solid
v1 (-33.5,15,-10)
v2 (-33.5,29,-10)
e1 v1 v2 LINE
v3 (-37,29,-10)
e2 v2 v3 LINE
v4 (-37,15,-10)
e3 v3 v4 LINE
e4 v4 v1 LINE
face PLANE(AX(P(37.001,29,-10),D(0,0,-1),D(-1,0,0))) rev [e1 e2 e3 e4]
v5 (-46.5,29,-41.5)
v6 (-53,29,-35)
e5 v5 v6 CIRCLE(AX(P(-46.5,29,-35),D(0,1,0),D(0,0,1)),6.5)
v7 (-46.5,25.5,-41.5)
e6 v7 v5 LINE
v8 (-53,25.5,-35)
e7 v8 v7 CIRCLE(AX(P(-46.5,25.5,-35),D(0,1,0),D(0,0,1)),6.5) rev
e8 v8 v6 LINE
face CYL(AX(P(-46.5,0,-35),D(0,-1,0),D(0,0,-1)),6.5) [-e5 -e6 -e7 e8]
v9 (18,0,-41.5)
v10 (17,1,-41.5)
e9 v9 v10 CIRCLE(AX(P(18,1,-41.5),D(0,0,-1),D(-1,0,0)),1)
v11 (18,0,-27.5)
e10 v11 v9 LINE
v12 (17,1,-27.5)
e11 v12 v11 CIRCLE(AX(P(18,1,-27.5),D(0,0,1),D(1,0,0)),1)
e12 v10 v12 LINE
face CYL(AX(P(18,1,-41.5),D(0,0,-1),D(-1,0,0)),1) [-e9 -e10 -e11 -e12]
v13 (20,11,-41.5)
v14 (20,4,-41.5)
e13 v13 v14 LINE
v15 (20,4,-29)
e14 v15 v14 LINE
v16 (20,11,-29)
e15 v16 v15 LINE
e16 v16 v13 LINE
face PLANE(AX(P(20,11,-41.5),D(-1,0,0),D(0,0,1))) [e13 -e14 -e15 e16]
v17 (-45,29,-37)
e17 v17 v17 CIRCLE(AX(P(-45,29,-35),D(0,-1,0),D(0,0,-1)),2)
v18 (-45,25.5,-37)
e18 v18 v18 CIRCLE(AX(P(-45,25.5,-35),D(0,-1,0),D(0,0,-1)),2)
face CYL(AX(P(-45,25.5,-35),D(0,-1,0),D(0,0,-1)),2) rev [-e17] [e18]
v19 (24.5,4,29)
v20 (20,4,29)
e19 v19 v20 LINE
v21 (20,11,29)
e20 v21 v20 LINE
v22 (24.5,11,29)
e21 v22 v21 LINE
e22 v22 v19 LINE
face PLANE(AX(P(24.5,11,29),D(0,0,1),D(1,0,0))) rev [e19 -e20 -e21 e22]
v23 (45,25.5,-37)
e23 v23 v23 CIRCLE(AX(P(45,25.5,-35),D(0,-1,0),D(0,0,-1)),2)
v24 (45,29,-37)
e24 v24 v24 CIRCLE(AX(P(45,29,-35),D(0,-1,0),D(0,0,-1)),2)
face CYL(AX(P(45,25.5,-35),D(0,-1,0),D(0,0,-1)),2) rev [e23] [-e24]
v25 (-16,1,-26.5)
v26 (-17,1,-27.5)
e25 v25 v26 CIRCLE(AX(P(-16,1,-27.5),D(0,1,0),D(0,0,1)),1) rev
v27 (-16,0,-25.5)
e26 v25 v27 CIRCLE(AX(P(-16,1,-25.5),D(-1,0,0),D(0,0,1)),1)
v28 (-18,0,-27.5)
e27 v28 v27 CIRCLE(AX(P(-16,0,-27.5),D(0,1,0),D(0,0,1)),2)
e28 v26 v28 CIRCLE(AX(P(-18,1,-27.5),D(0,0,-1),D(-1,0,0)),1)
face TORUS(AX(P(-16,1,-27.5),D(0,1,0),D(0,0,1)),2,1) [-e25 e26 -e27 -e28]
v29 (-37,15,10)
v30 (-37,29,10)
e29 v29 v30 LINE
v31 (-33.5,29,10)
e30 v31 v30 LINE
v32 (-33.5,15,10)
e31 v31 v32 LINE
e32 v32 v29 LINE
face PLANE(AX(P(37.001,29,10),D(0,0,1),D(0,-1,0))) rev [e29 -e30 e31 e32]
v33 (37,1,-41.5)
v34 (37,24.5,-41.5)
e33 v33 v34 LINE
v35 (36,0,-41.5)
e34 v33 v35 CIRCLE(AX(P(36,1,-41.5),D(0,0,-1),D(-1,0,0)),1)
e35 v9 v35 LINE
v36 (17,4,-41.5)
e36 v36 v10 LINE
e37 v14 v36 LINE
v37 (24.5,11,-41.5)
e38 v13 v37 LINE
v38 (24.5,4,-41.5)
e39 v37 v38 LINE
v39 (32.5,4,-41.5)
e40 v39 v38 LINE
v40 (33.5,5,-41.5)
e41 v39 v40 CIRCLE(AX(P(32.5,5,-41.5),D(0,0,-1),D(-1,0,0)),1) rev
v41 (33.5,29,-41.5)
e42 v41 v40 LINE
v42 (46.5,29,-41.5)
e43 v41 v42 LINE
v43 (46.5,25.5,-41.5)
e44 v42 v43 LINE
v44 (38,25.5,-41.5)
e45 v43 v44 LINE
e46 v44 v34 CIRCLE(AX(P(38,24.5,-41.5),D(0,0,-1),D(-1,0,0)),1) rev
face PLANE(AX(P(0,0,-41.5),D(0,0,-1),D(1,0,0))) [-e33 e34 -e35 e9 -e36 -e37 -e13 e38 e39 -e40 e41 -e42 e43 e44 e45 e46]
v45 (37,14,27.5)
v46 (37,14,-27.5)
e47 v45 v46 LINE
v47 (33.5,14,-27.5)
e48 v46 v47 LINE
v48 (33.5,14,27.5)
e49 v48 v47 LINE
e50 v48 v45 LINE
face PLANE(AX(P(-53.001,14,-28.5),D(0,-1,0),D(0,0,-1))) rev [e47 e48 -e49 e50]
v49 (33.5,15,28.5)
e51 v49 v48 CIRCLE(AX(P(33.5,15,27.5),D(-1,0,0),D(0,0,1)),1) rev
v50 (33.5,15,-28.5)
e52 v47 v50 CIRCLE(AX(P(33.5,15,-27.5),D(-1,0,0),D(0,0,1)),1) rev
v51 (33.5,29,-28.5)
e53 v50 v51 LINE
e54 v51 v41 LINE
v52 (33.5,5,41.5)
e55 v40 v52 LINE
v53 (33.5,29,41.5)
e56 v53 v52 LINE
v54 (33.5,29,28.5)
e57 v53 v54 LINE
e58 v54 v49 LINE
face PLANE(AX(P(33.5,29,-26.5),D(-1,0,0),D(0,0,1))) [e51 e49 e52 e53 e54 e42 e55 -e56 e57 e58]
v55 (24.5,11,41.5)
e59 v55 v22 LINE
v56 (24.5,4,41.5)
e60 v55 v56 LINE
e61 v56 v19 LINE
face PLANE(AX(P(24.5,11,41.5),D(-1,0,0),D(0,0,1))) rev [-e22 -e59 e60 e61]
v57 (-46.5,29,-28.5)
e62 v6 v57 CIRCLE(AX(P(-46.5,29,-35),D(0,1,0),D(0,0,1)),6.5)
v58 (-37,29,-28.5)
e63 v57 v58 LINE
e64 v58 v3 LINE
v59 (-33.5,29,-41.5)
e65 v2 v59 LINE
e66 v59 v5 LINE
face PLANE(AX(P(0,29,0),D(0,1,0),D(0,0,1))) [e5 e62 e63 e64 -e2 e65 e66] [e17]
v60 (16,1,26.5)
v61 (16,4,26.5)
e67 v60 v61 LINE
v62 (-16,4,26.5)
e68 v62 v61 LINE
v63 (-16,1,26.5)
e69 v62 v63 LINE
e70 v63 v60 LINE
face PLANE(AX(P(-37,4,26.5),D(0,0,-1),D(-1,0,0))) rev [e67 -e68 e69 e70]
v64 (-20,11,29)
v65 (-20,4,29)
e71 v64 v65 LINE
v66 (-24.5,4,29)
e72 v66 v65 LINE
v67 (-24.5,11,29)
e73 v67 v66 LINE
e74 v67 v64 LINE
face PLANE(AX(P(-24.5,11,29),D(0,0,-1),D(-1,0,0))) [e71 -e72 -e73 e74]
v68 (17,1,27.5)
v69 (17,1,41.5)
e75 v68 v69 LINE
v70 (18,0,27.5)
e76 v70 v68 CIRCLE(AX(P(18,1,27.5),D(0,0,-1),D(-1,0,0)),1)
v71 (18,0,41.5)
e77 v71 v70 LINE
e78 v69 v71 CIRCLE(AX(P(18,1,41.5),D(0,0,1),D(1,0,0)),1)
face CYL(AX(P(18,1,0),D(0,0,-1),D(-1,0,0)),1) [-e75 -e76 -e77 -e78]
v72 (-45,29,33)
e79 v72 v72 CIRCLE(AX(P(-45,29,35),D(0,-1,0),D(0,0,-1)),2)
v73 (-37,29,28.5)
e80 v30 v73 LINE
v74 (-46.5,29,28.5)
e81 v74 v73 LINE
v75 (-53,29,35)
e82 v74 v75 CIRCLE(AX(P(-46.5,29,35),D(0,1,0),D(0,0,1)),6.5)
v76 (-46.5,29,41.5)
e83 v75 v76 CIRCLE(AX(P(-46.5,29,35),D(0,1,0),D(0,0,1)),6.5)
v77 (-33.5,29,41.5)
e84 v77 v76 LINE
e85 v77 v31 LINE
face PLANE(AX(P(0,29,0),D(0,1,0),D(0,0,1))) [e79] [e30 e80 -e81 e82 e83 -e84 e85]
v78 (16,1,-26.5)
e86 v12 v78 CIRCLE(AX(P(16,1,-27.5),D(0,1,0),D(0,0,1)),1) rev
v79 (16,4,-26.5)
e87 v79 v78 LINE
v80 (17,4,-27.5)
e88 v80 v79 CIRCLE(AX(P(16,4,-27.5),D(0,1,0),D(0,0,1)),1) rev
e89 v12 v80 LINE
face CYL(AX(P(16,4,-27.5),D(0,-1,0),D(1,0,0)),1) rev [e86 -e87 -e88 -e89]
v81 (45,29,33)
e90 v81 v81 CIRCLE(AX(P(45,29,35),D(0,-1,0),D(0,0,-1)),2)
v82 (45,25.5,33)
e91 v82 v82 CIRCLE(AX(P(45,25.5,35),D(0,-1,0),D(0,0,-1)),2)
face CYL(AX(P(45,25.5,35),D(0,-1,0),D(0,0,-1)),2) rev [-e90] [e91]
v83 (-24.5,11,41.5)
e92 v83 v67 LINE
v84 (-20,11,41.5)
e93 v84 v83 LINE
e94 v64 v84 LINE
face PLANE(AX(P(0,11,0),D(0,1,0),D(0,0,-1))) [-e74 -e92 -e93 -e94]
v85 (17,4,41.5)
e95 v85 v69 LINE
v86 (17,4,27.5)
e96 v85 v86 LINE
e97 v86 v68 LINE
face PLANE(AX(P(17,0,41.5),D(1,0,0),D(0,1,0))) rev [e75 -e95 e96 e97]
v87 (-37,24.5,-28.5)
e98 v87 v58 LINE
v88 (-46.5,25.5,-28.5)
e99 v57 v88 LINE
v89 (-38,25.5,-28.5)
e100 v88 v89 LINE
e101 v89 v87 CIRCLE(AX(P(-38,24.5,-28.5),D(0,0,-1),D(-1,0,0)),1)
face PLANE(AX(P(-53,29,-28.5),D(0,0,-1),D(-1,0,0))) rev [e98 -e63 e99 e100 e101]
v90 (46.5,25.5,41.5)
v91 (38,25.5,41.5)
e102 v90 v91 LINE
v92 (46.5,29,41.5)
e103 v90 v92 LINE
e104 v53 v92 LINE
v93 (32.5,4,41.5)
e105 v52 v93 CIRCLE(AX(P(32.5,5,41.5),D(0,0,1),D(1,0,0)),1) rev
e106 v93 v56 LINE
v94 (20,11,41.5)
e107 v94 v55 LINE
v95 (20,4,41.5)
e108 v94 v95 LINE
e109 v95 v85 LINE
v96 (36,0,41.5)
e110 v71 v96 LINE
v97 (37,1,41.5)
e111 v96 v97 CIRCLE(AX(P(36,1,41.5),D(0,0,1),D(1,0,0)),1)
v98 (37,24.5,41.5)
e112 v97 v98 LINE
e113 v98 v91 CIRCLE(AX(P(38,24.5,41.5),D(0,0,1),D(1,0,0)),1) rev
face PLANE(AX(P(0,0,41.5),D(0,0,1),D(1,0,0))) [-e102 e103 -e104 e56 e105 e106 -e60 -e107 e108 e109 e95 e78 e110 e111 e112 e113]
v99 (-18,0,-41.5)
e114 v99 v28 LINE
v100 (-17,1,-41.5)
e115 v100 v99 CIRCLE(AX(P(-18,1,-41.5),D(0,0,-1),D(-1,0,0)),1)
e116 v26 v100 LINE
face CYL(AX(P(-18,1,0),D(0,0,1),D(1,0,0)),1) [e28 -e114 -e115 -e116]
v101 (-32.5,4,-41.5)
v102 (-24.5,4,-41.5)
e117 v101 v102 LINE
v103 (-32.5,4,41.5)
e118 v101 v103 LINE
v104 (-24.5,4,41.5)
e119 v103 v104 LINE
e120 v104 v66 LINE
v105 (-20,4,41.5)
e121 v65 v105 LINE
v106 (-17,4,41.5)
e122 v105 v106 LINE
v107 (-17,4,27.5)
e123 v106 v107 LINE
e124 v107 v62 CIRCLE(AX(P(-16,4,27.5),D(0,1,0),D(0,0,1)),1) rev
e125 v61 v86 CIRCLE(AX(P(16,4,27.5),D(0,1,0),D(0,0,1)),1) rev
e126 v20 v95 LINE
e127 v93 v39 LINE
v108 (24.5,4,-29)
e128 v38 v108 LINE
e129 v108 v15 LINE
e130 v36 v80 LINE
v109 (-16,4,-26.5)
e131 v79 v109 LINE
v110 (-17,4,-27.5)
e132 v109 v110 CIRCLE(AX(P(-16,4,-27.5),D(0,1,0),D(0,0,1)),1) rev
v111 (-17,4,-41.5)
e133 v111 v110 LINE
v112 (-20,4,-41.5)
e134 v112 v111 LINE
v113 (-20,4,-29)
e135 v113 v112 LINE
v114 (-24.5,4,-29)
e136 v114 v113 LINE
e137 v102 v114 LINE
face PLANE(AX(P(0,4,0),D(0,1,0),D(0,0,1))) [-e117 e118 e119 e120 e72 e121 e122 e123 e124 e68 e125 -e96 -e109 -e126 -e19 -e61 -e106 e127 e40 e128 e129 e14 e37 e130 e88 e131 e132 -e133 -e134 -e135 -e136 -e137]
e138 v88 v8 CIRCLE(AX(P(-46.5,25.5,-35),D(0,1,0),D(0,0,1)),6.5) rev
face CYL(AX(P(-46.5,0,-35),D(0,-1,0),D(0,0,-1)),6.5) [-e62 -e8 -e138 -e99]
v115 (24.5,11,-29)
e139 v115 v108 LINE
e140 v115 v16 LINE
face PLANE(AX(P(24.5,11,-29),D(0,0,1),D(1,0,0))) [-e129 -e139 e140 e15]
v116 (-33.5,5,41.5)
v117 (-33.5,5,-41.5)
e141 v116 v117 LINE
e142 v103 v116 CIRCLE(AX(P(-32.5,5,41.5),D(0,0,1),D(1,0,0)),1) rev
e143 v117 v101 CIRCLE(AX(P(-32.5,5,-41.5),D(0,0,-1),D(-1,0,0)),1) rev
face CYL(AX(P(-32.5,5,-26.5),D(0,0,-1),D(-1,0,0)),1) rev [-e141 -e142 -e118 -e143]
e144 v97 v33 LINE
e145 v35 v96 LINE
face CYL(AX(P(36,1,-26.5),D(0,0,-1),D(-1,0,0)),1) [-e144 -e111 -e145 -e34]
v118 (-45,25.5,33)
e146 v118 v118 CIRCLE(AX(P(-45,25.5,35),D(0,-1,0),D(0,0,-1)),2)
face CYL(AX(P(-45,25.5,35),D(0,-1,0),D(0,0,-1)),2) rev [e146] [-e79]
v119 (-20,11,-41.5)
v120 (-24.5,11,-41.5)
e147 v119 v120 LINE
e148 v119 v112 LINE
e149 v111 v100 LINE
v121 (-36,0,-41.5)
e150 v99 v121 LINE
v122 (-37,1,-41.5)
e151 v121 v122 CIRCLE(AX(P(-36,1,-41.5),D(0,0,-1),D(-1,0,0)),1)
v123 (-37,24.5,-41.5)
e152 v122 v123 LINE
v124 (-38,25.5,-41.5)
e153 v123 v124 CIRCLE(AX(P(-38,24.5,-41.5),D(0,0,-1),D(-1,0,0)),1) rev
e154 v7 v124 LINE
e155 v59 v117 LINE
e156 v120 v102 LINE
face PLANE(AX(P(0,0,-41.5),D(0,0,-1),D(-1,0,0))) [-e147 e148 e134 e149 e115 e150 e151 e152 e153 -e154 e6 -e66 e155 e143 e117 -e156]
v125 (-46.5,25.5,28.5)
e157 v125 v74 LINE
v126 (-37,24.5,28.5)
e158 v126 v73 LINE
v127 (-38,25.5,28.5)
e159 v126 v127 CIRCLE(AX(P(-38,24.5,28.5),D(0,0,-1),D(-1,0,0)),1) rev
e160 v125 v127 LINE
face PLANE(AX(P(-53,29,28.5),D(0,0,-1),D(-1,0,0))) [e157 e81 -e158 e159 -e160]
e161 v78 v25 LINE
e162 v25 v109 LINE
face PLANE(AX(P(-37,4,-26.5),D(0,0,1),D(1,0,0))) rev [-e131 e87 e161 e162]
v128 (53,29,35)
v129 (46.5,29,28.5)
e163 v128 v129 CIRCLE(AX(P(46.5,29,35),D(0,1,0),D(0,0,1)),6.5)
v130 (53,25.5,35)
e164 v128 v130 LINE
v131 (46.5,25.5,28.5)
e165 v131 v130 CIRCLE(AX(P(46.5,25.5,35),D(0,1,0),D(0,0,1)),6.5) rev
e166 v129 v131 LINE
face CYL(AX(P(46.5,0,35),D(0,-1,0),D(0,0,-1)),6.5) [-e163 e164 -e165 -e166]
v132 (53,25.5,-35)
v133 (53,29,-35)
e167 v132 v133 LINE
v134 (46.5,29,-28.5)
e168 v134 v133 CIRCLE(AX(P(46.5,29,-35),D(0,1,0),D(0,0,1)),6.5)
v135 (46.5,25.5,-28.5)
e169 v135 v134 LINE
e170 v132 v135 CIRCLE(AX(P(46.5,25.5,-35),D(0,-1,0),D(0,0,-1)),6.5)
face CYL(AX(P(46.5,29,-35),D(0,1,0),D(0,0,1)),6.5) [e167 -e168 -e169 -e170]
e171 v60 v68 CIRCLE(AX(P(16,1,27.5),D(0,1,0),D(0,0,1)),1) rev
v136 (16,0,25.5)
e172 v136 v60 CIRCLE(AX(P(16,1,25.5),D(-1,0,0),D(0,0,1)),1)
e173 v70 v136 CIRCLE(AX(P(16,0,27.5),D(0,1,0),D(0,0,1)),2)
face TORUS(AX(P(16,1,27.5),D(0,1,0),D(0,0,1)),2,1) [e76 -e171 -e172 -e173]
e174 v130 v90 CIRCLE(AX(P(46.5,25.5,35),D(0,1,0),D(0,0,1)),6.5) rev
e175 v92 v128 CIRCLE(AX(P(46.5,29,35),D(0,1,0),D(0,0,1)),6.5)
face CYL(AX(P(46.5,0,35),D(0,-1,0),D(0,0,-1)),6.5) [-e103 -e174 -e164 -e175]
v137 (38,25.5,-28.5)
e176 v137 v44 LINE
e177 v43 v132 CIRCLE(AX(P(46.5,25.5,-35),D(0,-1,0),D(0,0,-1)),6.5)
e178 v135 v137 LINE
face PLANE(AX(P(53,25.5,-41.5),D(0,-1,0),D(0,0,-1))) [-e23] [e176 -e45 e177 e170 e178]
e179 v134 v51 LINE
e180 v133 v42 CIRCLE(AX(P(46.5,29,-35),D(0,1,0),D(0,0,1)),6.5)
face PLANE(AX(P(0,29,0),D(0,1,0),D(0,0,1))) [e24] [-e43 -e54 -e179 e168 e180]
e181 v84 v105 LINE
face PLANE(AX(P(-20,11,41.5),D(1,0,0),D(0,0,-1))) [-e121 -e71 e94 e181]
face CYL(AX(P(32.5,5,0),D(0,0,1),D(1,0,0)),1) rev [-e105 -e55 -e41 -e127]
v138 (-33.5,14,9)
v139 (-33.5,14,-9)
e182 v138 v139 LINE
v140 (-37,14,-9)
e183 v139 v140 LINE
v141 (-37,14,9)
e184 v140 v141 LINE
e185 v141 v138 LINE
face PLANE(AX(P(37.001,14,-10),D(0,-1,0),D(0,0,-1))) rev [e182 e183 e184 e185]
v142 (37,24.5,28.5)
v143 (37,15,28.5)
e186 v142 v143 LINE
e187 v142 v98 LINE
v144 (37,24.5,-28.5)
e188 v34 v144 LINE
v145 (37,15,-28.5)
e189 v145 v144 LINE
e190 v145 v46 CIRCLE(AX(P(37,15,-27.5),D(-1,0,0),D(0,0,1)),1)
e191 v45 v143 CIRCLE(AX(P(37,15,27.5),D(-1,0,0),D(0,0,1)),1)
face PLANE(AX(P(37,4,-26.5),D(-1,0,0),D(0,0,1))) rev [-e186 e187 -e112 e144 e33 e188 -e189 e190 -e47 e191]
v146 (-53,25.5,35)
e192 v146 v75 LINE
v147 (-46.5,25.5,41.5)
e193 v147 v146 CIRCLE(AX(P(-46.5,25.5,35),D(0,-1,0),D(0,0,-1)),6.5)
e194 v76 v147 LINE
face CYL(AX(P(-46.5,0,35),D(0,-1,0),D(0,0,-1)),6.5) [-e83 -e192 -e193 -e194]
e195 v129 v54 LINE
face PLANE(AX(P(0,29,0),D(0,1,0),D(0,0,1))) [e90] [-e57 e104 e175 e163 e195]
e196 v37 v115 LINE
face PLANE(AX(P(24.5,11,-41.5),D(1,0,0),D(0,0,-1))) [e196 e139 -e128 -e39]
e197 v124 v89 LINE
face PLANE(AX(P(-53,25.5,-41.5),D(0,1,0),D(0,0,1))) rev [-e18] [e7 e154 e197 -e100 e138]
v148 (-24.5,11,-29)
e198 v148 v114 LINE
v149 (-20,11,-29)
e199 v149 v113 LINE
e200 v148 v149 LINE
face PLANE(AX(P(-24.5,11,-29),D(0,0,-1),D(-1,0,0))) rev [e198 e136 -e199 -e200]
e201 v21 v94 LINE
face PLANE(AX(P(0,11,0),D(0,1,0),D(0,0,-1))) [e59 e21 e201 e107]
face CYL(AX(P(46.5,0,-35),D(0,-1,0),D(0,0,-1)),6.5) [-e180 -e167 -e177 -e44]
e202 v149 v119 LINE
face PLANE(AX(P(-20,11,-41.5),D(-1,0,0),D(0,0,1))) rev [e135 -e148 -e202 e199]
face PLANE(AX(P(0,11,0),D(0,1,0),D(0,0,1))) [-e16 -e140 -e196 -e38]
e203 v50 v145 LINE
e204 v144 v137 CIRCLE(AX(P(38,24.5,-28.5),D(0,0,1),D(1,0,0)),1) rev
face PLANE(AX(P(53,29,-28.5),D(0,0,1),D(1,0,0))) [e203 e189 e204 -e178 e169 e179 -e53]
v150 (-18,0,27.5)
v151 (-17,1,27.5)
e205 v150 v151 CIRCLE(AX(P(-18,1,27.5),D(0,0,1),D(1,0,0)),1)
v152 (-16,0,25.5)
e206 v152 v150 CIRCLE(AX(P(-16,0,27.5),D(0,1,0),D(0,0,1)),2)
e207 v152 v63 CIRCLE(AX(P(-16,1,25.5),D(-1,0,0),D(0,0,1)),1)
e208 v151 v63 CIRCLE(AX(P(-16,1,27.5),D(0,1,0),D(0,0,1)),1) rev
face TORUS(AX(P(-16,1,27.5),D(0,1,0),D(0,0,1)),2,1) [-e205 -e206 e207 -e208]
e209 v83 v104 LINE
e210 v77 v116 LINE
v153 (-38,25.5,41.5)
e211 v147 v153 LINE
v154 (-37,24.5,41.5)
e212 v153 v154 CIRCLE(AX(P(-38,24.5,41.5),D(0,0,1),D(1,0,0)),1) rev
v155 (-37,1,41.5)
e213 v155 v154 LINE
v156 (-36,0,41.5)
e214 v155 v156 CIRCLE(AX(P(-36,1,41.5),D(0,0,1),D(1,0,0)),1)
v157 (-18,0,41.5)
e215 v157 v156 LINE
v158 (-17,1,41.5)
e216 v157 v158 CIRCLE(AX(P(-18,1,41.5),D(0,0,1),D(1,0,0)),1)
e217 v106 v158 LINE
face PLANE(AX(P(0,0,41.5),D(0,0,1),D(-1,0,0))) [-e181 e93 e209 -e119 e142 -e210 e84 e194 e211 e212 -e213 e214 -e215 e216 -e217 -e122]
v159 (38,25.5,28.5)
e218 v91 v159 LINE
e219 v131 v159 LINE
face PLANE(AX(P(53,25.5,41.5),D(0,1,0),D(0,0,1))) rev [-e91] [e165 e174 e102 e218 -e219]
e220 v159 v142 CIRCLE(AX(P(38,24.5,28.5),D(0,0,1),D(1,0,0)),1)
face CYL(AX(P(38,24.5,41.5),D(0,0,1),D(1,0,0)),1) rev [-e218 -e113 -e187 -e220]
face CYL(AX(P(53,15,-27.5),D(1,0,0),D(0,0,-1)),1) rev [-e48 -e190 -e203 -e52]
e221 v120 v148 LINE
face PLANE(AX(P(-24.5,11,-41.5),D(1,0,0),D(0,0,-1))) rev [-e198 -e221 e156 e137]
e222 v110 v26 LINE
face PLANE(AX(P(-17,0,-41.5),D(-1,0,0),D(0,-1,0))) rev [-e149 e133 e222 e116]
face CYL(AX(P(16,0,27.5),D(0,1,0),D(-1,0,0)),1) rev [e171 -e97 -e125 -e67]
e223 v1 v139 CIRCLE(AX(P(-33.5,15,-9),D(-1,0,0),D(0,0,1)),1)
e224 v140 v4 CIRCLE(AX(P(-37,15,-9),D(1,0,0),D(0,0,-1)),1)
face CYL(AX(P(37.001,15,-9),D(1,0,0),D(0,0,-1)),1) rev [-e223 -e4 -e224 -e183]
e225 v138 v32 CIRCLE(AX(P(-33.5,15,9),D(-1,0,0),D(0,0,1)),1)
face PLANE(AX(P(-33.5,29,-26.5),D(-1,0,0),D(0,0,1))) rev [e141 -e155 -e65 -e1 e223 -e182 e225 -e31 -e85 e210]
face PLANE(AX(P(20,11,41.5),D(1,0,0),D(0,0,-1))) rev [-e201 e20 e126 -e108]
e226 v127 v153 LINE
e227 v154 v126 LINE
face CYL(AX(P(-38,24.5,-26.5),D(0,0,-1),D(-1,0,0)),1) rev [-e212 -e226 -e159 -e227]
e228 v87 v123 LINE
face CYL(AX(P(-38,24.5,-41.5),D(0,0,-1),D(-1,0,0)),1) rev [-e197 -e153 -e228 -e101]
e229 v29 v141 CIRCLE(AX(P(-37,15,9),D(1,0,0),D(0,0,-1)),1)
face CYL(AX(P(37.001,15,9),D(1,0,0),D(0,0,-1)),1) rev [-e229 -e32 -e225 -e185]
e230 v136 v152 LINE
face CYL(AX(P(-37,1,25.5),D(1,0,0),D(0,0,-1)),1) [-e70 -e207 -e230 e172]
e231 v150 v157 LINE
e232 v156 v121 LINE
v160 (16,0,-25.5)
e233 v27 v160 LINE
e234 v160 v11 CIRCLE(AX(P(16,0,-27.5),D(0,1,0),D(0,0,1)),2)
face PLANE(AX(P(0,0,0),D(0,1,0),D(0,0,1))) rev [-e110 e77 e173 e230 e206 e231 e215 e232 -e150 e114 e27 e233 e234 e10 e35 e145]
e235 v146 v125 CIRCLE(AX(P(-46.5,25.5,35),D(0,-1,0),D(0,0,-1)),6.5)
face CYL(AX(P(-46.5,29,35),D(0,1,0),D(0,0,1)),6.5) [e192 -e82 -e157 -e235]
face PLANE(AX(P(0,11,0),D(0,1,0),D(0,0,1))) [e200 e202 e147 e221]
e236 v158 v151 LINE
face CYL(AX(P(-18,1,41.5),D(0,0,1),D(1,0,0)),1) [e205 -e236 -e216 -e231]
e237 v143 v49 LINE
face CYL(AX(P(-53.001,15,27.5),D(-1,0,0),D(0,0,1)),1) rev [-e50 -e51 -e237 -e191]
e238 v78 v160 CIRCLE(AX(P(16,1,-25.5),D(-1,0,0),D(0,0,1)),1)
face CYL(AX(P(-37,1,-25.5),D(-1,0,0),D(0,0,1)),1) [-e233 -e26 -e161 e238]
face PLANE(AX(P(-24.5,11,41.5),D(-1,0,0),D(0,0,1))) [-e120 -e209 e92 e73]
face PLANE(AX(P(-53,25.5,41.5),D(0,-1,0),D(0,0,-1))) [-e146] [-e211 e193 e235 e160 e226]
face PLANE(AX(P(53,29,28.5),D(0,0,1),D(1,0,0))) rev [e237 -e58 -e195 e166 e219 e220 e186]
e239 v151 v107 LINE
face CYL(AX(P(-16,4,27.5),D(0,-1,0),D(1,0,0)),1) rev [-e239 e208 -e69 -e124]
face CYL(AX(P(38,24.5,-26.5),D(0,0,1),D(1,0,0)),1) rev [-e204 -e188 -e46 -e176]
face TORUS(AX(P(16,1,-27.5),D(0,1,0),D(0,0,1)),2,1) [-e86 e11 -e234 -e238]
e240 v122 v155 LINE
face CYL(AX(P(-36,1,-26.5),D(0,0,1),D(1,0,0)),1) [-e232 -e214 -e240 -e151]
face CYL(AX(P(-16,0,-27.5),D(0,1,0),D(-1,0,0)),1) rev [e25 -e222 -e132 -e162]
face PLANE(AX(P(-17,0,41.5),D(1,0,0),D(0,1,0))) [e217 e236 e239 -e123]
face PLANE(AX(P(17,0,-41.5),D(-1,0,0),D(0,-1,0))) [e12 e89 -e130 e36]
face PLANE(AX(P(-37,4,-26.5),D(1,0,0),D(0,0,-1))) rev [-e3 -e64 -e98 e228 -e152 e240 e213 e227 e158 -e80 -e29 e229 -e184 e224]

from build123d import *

# Parameters (mm, degrees)
SKETCH1_W                       = 74
SKETCH1_H                       = 53
BOSS_EXTRUDE1_DEPTH             = 4
SKETCH2_W                       = 3.5
SKETCH2_H                       = 53
BOSS_EXTRUDE2_DEPTH             = 25
CUT_EXTRUDE1_REACH              = 85.781
SKETCH3_W                       = 20
SKETCH3_H                       = 15
SKETCH5_W                       = 20
SKETCH5_H                       = 4
BOSS_EXTRUDE4_DEPTH             = 15
MIRROR4_COPY_1_SKETCH_W         = 20
MIRROR4_COPY_1_SKETCH_H         = 4
MIRROR4_COPY_1_DEPTH            = 15
SKETCH6_W                       = 3.5
SKETCH6_H                       = 15
BOSS_EXTRUDE5_DEPTH             = 25
MIRROR6_COPY_1_SKETCH_W         = 3.5
MIRROR6_COPY_1_SKETCH_H         = 15
MIRROR6_COPY_1_DEPTH            = 25
MIRROR6_COPY_2_SKETCH_W         = 3.5
MIRROR6_COPY_2_SKETCH_H         = 15
MIRROR6_COPY_2_DEPTH            = 25
SKETCH7_W                       = 4.5
SKETCH7_H                       = 12.5
BOSS_EXTRUDE6_DEPTH             = 7
MIRROR8_COPY_1_SKETCH_W         = 4.5
MIRROR8_COPY_1_SKETCH_H         = 12.5
MIRROR8_COPY_1_DEPTH            = 7
SKETCH8_W                       = 13
SKETCH8_H                       = 3.5
BOSS_EXTRUDE7_DEPTH             = 16
MIRROR10_COPY_1_SKETCH_W        = 13
MIRROR10_COPY_1_SKETCH_H        = 3.5
MIRROR10_COPY_1_DEPTH           = 16
CUT_EXTRUDE2_REACH              = 105.263
SKETCH9_W                       = 57
SKETCH9_H                       = 15
F_4_0MM_CLEARANCE_DOWEL_HOLE1_D = 4
FILLET1_R                       = 6.5
FILLET2_R                       = 1
FILLET3_R                       = 1


with BuildPart() as part:
    # Sketch1 → Boss-Extrude1 (new body)
    with BuildSketch(Plane(origin=(0, 0, 0), x_dir=(1, 0, 0), z_dir=(0, 1, 0))):
        Rectangle(SKETCH1_W, SKETCH1_H)
    extrude(amount=BOSS_EXTRUDE1_DEPTH)

    # Sketch2 → Boss-Extrude2 (add)
    with BuildSketch(Plane(origin=(0, 4, 0), x_dir=(1, 0, 0), z_dir=(0, 1, 0))):
        with Locations((-35.25, 0)):
            Rectangle(SKETCH2_W, SKETCH2_H)
    boss_extrude2 = extrude(amount=BOSS_EXTRUDE2_DEPTH)

    # Mirror1: Boss-Extrude2 across plane
    add(boss_extrude2.mirror(Plane(origin=(0, 0, 0), x_dir=(0, 0, 1), z_dir=(1, 0, 0))))

    # Sketch3 → Cut-Extrude1 (cut, up to next)
    with BuildSketch(Plane.ZY.offset(37), mode=Mode.PRIVATE) as cut_extrude1_sk1:
        with Locations((0, 21.5)):
            Rectangle(SKETCH3_W, SKETCH3_H)
    cut_extrude1_tool1 = extrude(cut_extrude1_sk1.sketch, amount=-CUT_EXTRUDE1_REACH, mode=Mode.PRIVATE) & part.part
    add(cut_extrude1_tool1.solids().sort_by_distance((-37, 21.5, 0))[0], mode=Mode.SUBTRACT)

    # Sketch5 → Boss-Extrude4 (add)
    with BuildSketch(Plane(origin=(0, 0, -26.5), x_dir=(-1, 0, 0), z_dir=(0, 0, -1))):
        with Locations((27, 2)):
            Rectangle(SKETCH5_W, SKETCH5_H)
    boss_extrude4 = extrude(amount=BOSS_EXTRUDE4_DEPTH)

    # Mirror3: Boss-Extrude4 across plane
    add(boss_extrude4.mirror(Plane.XY))

    # Mirror4: Boss-Extrude4 across plane
    add(boss_extrude4.mirror(Plane(origin=(0, 0, 0), x_dir=(0, 0, 1), z_dir=(1, 0, 0))))

    # Mirror4 copy 1 sketch → Mirror4 copy 1 (add)
    with BuildSketch(Plane.XY.offset(26.5)):
        with Locations((27, 2)):
            Rectangle(MIRROR4_COPY_1_SKETCH_W, MIRROR4_COPY_1_SKETCH_H)
    extrude(amount=MIRROR4_COPY_1_DEPTH)

    # Sketch6 → Boss-Extrude5 (add)
    with BuildSketch(Plane(origin=(0, 4, 0), x_dir=(1, 0, 0), z_dir=(0, 1, 0))):
        with Locations((-35.25, 34)):
            Rectangle(SKETCH6_W, SKETCH6_H)
    boss_extrude5 = extrude(amount=BOSS_EXTRUDE5_DEPTH)

    # Mirror5: Boss-Extrude5 across plane
    add(boss_extrude5.mirror(Plane.XY))

    # Mirror6 copy 1 sketch → Mirror6 copy 1 (add)
    with BuildSketch(Plane(origin=(0, 4, 0), x_dir=(-1, 0, 0), z_dir=(0, 1, 0))):
        with Locations((-35.25, 34)):
            Rectangle(MIRROR6_COPY_1_SKETCH_W, MIRROR6_COPY_1_SKETCH_H)
    extrude(amount=MIRROR6_COPY_1_DEPTH)

    # Mirror6 copy 2 sketch → Mirror6 copy 2 (add)
    with BuildSketch(Plane(origin=(0, 4, 0), x_dir=(-1, 0, 0), z_dir=(0, 1, 0))):
        with Locations((-35.25, -34)):
            Rectangle(MIRROR6_COPY_2_SKETCH_W, MIRROR6_COPY_2_SKETCH_H)
    extrude(amount=MIRROR6_COPY_2_DEPTH)

    # Sketch7 → Boss-Extrude6 (add)
    with BuildSketch(Plane(origin=(0, 4, 0), x_dir=(1, 0, 0), z_dir=(0, 1, 0))):
        with Locations((-22.25, 35.25)):
            Rectangle(SKETCH7_W, SKETCH7_H)
    boss_extrude6 = extrude(amount=BOSS_EXTRUDE6_DEPTH)

    # Mirror7: Boss-Extrude6 across plane
    add(boss_extrude6.mirror(Plane.XY))

    # Mirror8: Boss-Extrude6 across plane
    add(boss_extrude6.mirror(Plane(origin=(0, 0, 0), x_dir=(0, 0, 1), z_dir=(1, 0, 0))))

    # Mirror8 copy 1 sketch → Mirror8 copy 1 (add)
    with BuildSketch(Plane(origin=(0, 4, 0), x_dir=(-1, 0, 0), z_dir=(0, 1, 0))):
        with Locations((-22.25, 35.25)):
            Rectangle(MIRROR8_COPY_1_SKETCH_W, MIRROR8_COPY_1_SKETCH_H)
    extrude(amount=MIRROR8_COPY_1_DEPTH)

    # Sketch8 → Boss-Extrude7 (add)
    with BuildSketch(Plane.ZY.offset(37)):
        with Locations((-35, 27.25)):
            Rectangle(SKETCH8_W, SKETCH8_H)
    boss_extrude7 = extrude(amount=BOSS_EXTRUDE7_DEPTH)

    # Mirror9: Boss-Extrude7 across plane
    add(boss_extrude7.mirror(Plane.XY))

    # Mirror10: Boss-Extrude7 across plane
    add(boss_extrude7.mirror(Plane(origin=(0, 0, 0), x_dir=(0, 0, 1), z_dir=(1, 0, 0))))

    # Mirror10 copy 1 sketch → Mirror10 copy 1 (add)
    with BuildSketch(Plane(origin=(37, 0, 0), x_dir=(0, 0, -1), z_dir=(1, 0, 0))):
        with Locations((-35, 27.25)):
            Rectangle(MIRROR10_COPY_1_SKETCH_W, MIRROR10_COPY_1_SKETCH_H)
    extrude(amount=MIRROR10_COPY_1_DEPTH)

    # Sketch9 → Cut-Extrude2 (cut, up to next)
    with BuildSketch(Plane(origin=(37, 0, 0), x_dir=(0, 0, -1), z_dir=(1, 0, 0)), mode=Mode.PRIVATE) as cut_extrude2_sk1:
        with Locations((0, 21.5)):
            Rectangle(SKETCH9_W, SKETCH9_H)
    cut_extrude2_tool1 = extrude(cut_extrude2_sk1.sketch, amount=-CUT_EXTRUDE2_REACH, mode=Mode.PRIVATE) & part.part
    add(cut_extrude2_tool1.solids().sort_by_distance((37, 21.5, 0))[0], mode=Mode.SUBTRACT)

    # Ø4.0mm Clearance Dowel Hole1 (through all)
    with Locations(Plane(origin=(0, 25.5, 0), x_dir=(-1, 0, 0), z_dir=(0, -1, 0))):
        with Locations((-45, 35), (-45, -35), (45, 35), (45, -35)):
            Hole(F_4_0MM_CLEARANCE_DOWEL_HOLE1_D / 2)

    # Fillet1
    fillet1_edges = [part.edges().sort_by_distance(p)[0] for p in [
        (-53, 27.25, -41.5),
        (-53, 27.25, -28.5),
        (-53, 27.25, 41.5),
        (-53, 27.25, 28.5),
        (53, 27.25, 41.5),
        (53, 27.25, 28.5),
        (53, 27.25, -41.5),
        (53, 27.25, -28.5),
    ]]
    fillet(fillet1_edges, radius=FILLET1_R - 0.0001)  # a hair under: the kernel refuses the full size

    # Fillet2
    fillet2_edges = [part.edges().sort_by_distance(p)[0] for p in [
        (-33.5, 4, 0),
        (-37, 25.5, -35),
        (-37, 25.5, 35),
        (37, 25.5, 35),
        (37, 25.5, -35),
        (35.25, 14, 28.5),
        (35.25, 14, -28.5),
        (33.5, 4, 0),
        (-35.25, 14, -10),
        (-35.25, 14, 10),
        (-17, 2, -26.5),
        (-17, 2, 26.5),
        (17, 2, 26.5),
        (17, 2, -26.5),
    ]]
    fillet(fillet2_edges, radius=FILLET2_R)

    # Fillet3
    fillet3_edges = [part.edges().sort_by_distance(p)[0] for p in [
        (0, 0, -26.5),
        (0, 0, 26.5),
        (16.707106781, 0, -26.792893219),
        (-16.707106781, 0, -26.792893219),
        (-16.707106781, 0, 26.792893219),
        (16.707106781, 0, 26.792893219),
        (-37, 0, 0),
        (37, 0, 0),
        (-17, 0, -34.5),
        (-17, 0, 34.5),
        (17, 0, 34.5),
        (17, 0, -34.5),
    ]]
    fillet(fillet3_edges, radius=FILLET3_R)


solid = part.part
